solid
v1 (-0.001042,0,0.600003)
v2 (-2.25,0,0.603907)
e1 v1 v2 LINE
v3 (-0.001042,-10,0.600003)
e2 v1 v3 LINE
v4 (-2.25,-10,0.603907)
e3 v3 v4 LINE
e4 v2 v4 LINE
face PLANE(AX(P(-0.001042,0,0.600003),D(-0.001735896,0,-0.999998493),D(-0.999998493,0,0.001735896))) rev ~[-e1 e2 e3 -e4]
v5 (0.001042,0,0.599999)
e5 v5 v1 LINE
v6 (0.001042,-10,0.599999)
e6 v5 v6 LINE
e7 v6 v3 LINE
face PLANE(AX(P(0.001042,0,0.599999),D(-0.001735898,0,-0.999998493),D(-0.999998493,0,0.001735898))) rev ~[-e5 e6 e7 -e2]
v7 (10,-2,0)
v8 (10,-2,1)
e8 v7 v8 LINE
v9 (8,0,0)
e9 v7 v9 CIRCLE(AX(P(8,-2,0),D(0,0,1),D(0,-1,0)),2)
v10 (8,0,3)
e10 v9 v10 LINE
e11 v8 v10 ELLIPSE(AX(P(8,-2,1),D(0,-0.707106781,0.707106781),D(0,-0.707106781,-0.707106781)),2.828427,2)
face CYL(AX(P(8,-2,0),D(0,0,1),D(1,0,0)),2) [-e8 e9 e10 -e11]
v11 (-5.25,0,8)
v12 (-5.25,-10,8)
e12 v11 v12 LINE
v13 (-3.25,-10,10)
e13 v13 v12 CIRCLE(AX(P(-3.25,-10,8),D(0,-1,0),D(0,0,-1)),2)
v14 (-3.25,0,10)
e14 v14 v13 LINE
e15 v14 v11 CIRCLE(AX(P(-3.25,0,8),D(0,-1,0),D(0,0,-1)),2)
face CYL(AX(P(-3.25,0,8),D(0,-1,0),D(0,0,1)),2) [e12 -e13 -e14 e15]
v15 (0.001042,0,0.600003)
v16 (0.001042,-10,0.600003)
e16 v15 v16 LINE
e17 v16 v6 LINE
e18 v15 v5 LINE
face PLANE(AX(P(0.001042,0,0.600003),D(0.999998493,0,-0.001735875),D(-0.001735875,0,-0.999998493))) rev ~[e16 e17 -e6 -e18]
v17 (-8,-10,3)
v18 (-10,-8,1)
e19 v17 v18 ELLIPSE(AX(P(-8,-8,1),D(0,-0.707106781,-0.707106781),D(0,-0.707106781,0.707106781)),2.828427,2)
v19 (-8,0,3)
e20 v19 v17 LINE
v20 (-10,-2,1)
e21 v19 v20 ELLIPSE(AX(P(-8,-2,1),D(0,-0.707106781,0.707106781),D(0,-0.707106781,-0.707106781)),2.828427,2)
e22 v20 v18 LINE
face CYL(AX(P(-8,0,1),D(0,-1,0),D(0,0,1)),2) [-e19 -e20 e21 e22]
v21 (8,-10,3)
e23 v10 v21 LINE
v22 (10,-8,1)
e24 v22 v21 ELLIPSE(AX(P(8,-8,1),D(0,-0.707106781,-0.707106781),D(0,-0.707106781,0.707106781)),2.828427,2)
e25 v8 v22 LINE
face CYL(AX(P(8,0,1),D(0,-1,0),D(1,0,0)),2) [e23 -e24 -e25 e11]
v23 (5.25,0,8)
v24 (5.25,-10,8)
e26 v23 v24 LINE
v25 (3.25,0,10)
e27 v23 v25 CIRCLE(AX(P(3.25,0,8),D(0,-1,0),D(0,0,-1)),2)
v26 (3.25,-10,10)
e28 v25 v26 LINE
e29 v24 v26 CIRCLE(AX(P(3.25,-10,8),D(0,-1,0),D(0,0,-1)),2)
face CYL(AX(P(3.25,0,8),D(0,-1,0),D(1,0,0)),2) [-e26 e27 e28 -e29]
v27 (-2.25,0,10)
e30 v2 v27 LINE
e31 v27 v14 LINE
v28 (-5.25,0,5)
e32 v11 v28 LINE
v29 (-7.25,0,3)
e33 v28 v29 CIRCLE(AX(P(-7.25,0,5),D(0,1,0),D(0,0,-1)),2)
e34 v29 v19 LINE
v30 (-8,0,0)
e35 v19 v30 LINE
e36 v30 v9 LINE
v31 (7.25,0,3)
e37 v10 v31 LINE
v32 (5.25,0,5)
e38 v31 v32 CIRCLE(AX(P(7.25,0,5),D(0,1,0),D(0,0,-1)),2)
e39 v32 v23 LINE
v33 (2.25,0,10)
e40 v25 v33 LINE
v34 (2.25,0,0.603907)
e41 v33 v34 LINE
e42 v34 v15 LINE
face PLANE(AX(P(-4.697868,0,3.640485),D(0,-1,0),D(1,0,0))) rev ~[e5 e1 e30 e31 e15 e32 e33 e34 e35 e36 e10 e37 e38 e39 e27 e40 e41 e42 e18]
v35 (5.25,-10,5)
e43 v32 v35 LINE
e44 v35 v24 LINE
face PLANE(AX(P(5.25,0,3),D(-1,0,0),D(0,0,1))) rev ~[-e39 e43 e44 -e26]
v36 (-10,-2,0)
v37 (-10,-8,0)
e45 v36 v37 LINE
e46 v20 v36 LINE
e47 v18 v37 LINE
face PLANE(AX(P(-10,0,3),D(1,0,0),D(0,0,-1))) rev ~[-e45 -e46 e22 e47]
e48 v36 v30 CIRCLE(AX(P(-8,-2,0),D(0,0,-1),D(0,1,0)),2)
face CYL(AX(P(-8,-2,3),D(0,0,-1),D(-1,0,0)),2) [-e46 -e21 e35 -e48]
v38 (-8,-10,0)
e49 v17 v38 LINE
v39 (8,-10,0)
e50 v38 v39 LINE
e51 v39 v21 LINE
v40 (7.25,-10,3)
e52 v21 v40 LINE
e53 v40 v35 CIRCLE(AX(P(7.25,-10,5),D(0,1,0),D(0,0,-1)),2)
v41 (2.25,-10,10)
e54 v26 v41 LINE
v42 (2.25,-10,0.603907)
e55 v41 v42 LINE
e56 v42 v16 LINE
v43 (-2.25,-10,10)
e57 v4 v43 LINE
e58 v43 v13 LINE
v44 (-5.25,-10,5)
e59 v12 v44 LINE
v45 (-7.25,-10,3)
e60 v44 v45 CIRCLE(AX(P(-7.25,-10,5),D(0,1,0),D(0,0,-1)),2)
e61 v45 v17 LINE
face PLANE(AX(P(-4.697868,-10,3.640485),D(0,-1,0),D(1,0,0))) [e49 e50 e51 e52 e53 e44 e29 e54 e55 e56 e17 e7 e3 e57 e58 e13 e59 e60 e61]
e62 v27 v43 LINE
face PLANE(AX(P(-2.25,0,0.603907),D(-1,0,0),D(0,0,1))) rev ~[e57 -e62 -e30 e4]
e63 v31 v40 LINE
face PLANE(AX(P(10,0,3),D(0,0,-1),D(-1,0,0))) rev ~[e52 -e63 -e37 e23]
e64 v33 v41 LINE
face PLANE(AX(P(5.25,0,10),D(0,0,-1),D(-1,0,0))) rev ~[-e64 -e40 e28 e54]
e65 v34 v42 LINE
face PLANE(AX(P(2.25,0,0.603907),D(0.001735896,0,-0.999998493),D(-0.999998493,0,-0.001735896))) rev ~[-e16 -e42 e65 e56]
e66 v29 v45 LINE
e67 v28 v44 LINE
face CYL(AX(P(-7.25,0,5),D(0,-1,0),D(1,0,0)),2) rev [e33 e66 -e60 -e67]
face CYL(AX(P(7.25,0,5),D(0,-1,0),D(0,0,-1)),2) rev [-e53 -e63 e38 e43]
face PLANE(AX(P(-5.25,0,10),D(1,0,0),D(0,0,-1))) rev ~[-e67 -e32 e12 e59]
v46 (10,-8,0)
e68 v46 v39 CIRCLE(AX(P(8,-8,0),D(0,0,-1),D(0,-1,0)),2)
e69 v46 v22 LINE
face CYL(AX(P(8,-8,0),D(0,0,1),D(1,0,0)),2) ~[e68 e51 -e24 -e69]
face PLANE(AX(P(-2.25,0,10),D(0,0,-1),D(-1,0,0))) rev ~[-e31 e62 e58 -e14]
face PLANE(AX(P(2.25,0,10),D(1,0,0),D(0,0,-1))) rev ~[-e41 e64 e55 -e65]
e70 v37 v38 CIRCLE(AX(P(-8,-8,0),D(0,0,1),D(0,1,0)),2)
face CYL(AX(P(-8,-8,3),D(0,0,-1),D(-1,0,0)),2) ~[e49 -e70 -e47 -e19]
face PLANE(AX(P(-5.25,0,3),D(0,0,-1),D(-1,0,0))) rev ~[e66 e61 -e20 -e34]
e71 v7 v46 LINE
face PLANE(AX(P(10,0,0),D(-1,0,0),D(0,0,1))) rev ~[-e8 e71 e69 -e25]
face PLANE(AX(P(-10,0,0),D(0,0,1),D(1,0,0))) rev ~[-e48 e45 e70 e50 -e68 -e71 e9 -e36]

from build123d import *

# Parameters (mm, degrees)
F1_DEPTH = 10
F2_R     = 2


# Not quite as in the source:
# - ends of sketch curves that miss each other by under 0.0002 mm in the source are joined


with BuildPart() as f1:
    # F0 (on Front) → F1 (new body)
    with BuildSketch(Plane.XZ):
        Polygon((-0.0010415313, 0.600002712), (-2.25, 0.6039066758), (-2.25, 10), (-5.25, 10), (-5.25, 3), (-10, 3), (-10, 0), (0, 0), align=None)
        Polygon((0.0010415376, 0.599999096), (-0.0010415313, 0.600002712), (0, 0), align=None)
        Polygon((2.25, 0.6039066758), (0.0010415313, 0.600002712), (0, 0), (10, 0), (10, 3), (5.25, 3), (5.25, 10), (2.25, 10), align=None)
    extrude(amount=F1_DEPTH)

    # F2
    f2_edges = [f1.edges().sort_by_distance(p)[0] for p in [
        (-5.25, -5, 3),
        (5.25, -5, 3),
        (10, -5, 3),
        (5.25, -5, 10),
        (-5.25, -5, 10),
        (-10, -5, 3),
        (-10, -10, 1.5),
        (-10, 0, 1.5),
        (10, -10, 1.5),
        (10, 0, 1.5),
    ]]
    fillet(f2_edges, radius=F2_R)


solid = f1.part
